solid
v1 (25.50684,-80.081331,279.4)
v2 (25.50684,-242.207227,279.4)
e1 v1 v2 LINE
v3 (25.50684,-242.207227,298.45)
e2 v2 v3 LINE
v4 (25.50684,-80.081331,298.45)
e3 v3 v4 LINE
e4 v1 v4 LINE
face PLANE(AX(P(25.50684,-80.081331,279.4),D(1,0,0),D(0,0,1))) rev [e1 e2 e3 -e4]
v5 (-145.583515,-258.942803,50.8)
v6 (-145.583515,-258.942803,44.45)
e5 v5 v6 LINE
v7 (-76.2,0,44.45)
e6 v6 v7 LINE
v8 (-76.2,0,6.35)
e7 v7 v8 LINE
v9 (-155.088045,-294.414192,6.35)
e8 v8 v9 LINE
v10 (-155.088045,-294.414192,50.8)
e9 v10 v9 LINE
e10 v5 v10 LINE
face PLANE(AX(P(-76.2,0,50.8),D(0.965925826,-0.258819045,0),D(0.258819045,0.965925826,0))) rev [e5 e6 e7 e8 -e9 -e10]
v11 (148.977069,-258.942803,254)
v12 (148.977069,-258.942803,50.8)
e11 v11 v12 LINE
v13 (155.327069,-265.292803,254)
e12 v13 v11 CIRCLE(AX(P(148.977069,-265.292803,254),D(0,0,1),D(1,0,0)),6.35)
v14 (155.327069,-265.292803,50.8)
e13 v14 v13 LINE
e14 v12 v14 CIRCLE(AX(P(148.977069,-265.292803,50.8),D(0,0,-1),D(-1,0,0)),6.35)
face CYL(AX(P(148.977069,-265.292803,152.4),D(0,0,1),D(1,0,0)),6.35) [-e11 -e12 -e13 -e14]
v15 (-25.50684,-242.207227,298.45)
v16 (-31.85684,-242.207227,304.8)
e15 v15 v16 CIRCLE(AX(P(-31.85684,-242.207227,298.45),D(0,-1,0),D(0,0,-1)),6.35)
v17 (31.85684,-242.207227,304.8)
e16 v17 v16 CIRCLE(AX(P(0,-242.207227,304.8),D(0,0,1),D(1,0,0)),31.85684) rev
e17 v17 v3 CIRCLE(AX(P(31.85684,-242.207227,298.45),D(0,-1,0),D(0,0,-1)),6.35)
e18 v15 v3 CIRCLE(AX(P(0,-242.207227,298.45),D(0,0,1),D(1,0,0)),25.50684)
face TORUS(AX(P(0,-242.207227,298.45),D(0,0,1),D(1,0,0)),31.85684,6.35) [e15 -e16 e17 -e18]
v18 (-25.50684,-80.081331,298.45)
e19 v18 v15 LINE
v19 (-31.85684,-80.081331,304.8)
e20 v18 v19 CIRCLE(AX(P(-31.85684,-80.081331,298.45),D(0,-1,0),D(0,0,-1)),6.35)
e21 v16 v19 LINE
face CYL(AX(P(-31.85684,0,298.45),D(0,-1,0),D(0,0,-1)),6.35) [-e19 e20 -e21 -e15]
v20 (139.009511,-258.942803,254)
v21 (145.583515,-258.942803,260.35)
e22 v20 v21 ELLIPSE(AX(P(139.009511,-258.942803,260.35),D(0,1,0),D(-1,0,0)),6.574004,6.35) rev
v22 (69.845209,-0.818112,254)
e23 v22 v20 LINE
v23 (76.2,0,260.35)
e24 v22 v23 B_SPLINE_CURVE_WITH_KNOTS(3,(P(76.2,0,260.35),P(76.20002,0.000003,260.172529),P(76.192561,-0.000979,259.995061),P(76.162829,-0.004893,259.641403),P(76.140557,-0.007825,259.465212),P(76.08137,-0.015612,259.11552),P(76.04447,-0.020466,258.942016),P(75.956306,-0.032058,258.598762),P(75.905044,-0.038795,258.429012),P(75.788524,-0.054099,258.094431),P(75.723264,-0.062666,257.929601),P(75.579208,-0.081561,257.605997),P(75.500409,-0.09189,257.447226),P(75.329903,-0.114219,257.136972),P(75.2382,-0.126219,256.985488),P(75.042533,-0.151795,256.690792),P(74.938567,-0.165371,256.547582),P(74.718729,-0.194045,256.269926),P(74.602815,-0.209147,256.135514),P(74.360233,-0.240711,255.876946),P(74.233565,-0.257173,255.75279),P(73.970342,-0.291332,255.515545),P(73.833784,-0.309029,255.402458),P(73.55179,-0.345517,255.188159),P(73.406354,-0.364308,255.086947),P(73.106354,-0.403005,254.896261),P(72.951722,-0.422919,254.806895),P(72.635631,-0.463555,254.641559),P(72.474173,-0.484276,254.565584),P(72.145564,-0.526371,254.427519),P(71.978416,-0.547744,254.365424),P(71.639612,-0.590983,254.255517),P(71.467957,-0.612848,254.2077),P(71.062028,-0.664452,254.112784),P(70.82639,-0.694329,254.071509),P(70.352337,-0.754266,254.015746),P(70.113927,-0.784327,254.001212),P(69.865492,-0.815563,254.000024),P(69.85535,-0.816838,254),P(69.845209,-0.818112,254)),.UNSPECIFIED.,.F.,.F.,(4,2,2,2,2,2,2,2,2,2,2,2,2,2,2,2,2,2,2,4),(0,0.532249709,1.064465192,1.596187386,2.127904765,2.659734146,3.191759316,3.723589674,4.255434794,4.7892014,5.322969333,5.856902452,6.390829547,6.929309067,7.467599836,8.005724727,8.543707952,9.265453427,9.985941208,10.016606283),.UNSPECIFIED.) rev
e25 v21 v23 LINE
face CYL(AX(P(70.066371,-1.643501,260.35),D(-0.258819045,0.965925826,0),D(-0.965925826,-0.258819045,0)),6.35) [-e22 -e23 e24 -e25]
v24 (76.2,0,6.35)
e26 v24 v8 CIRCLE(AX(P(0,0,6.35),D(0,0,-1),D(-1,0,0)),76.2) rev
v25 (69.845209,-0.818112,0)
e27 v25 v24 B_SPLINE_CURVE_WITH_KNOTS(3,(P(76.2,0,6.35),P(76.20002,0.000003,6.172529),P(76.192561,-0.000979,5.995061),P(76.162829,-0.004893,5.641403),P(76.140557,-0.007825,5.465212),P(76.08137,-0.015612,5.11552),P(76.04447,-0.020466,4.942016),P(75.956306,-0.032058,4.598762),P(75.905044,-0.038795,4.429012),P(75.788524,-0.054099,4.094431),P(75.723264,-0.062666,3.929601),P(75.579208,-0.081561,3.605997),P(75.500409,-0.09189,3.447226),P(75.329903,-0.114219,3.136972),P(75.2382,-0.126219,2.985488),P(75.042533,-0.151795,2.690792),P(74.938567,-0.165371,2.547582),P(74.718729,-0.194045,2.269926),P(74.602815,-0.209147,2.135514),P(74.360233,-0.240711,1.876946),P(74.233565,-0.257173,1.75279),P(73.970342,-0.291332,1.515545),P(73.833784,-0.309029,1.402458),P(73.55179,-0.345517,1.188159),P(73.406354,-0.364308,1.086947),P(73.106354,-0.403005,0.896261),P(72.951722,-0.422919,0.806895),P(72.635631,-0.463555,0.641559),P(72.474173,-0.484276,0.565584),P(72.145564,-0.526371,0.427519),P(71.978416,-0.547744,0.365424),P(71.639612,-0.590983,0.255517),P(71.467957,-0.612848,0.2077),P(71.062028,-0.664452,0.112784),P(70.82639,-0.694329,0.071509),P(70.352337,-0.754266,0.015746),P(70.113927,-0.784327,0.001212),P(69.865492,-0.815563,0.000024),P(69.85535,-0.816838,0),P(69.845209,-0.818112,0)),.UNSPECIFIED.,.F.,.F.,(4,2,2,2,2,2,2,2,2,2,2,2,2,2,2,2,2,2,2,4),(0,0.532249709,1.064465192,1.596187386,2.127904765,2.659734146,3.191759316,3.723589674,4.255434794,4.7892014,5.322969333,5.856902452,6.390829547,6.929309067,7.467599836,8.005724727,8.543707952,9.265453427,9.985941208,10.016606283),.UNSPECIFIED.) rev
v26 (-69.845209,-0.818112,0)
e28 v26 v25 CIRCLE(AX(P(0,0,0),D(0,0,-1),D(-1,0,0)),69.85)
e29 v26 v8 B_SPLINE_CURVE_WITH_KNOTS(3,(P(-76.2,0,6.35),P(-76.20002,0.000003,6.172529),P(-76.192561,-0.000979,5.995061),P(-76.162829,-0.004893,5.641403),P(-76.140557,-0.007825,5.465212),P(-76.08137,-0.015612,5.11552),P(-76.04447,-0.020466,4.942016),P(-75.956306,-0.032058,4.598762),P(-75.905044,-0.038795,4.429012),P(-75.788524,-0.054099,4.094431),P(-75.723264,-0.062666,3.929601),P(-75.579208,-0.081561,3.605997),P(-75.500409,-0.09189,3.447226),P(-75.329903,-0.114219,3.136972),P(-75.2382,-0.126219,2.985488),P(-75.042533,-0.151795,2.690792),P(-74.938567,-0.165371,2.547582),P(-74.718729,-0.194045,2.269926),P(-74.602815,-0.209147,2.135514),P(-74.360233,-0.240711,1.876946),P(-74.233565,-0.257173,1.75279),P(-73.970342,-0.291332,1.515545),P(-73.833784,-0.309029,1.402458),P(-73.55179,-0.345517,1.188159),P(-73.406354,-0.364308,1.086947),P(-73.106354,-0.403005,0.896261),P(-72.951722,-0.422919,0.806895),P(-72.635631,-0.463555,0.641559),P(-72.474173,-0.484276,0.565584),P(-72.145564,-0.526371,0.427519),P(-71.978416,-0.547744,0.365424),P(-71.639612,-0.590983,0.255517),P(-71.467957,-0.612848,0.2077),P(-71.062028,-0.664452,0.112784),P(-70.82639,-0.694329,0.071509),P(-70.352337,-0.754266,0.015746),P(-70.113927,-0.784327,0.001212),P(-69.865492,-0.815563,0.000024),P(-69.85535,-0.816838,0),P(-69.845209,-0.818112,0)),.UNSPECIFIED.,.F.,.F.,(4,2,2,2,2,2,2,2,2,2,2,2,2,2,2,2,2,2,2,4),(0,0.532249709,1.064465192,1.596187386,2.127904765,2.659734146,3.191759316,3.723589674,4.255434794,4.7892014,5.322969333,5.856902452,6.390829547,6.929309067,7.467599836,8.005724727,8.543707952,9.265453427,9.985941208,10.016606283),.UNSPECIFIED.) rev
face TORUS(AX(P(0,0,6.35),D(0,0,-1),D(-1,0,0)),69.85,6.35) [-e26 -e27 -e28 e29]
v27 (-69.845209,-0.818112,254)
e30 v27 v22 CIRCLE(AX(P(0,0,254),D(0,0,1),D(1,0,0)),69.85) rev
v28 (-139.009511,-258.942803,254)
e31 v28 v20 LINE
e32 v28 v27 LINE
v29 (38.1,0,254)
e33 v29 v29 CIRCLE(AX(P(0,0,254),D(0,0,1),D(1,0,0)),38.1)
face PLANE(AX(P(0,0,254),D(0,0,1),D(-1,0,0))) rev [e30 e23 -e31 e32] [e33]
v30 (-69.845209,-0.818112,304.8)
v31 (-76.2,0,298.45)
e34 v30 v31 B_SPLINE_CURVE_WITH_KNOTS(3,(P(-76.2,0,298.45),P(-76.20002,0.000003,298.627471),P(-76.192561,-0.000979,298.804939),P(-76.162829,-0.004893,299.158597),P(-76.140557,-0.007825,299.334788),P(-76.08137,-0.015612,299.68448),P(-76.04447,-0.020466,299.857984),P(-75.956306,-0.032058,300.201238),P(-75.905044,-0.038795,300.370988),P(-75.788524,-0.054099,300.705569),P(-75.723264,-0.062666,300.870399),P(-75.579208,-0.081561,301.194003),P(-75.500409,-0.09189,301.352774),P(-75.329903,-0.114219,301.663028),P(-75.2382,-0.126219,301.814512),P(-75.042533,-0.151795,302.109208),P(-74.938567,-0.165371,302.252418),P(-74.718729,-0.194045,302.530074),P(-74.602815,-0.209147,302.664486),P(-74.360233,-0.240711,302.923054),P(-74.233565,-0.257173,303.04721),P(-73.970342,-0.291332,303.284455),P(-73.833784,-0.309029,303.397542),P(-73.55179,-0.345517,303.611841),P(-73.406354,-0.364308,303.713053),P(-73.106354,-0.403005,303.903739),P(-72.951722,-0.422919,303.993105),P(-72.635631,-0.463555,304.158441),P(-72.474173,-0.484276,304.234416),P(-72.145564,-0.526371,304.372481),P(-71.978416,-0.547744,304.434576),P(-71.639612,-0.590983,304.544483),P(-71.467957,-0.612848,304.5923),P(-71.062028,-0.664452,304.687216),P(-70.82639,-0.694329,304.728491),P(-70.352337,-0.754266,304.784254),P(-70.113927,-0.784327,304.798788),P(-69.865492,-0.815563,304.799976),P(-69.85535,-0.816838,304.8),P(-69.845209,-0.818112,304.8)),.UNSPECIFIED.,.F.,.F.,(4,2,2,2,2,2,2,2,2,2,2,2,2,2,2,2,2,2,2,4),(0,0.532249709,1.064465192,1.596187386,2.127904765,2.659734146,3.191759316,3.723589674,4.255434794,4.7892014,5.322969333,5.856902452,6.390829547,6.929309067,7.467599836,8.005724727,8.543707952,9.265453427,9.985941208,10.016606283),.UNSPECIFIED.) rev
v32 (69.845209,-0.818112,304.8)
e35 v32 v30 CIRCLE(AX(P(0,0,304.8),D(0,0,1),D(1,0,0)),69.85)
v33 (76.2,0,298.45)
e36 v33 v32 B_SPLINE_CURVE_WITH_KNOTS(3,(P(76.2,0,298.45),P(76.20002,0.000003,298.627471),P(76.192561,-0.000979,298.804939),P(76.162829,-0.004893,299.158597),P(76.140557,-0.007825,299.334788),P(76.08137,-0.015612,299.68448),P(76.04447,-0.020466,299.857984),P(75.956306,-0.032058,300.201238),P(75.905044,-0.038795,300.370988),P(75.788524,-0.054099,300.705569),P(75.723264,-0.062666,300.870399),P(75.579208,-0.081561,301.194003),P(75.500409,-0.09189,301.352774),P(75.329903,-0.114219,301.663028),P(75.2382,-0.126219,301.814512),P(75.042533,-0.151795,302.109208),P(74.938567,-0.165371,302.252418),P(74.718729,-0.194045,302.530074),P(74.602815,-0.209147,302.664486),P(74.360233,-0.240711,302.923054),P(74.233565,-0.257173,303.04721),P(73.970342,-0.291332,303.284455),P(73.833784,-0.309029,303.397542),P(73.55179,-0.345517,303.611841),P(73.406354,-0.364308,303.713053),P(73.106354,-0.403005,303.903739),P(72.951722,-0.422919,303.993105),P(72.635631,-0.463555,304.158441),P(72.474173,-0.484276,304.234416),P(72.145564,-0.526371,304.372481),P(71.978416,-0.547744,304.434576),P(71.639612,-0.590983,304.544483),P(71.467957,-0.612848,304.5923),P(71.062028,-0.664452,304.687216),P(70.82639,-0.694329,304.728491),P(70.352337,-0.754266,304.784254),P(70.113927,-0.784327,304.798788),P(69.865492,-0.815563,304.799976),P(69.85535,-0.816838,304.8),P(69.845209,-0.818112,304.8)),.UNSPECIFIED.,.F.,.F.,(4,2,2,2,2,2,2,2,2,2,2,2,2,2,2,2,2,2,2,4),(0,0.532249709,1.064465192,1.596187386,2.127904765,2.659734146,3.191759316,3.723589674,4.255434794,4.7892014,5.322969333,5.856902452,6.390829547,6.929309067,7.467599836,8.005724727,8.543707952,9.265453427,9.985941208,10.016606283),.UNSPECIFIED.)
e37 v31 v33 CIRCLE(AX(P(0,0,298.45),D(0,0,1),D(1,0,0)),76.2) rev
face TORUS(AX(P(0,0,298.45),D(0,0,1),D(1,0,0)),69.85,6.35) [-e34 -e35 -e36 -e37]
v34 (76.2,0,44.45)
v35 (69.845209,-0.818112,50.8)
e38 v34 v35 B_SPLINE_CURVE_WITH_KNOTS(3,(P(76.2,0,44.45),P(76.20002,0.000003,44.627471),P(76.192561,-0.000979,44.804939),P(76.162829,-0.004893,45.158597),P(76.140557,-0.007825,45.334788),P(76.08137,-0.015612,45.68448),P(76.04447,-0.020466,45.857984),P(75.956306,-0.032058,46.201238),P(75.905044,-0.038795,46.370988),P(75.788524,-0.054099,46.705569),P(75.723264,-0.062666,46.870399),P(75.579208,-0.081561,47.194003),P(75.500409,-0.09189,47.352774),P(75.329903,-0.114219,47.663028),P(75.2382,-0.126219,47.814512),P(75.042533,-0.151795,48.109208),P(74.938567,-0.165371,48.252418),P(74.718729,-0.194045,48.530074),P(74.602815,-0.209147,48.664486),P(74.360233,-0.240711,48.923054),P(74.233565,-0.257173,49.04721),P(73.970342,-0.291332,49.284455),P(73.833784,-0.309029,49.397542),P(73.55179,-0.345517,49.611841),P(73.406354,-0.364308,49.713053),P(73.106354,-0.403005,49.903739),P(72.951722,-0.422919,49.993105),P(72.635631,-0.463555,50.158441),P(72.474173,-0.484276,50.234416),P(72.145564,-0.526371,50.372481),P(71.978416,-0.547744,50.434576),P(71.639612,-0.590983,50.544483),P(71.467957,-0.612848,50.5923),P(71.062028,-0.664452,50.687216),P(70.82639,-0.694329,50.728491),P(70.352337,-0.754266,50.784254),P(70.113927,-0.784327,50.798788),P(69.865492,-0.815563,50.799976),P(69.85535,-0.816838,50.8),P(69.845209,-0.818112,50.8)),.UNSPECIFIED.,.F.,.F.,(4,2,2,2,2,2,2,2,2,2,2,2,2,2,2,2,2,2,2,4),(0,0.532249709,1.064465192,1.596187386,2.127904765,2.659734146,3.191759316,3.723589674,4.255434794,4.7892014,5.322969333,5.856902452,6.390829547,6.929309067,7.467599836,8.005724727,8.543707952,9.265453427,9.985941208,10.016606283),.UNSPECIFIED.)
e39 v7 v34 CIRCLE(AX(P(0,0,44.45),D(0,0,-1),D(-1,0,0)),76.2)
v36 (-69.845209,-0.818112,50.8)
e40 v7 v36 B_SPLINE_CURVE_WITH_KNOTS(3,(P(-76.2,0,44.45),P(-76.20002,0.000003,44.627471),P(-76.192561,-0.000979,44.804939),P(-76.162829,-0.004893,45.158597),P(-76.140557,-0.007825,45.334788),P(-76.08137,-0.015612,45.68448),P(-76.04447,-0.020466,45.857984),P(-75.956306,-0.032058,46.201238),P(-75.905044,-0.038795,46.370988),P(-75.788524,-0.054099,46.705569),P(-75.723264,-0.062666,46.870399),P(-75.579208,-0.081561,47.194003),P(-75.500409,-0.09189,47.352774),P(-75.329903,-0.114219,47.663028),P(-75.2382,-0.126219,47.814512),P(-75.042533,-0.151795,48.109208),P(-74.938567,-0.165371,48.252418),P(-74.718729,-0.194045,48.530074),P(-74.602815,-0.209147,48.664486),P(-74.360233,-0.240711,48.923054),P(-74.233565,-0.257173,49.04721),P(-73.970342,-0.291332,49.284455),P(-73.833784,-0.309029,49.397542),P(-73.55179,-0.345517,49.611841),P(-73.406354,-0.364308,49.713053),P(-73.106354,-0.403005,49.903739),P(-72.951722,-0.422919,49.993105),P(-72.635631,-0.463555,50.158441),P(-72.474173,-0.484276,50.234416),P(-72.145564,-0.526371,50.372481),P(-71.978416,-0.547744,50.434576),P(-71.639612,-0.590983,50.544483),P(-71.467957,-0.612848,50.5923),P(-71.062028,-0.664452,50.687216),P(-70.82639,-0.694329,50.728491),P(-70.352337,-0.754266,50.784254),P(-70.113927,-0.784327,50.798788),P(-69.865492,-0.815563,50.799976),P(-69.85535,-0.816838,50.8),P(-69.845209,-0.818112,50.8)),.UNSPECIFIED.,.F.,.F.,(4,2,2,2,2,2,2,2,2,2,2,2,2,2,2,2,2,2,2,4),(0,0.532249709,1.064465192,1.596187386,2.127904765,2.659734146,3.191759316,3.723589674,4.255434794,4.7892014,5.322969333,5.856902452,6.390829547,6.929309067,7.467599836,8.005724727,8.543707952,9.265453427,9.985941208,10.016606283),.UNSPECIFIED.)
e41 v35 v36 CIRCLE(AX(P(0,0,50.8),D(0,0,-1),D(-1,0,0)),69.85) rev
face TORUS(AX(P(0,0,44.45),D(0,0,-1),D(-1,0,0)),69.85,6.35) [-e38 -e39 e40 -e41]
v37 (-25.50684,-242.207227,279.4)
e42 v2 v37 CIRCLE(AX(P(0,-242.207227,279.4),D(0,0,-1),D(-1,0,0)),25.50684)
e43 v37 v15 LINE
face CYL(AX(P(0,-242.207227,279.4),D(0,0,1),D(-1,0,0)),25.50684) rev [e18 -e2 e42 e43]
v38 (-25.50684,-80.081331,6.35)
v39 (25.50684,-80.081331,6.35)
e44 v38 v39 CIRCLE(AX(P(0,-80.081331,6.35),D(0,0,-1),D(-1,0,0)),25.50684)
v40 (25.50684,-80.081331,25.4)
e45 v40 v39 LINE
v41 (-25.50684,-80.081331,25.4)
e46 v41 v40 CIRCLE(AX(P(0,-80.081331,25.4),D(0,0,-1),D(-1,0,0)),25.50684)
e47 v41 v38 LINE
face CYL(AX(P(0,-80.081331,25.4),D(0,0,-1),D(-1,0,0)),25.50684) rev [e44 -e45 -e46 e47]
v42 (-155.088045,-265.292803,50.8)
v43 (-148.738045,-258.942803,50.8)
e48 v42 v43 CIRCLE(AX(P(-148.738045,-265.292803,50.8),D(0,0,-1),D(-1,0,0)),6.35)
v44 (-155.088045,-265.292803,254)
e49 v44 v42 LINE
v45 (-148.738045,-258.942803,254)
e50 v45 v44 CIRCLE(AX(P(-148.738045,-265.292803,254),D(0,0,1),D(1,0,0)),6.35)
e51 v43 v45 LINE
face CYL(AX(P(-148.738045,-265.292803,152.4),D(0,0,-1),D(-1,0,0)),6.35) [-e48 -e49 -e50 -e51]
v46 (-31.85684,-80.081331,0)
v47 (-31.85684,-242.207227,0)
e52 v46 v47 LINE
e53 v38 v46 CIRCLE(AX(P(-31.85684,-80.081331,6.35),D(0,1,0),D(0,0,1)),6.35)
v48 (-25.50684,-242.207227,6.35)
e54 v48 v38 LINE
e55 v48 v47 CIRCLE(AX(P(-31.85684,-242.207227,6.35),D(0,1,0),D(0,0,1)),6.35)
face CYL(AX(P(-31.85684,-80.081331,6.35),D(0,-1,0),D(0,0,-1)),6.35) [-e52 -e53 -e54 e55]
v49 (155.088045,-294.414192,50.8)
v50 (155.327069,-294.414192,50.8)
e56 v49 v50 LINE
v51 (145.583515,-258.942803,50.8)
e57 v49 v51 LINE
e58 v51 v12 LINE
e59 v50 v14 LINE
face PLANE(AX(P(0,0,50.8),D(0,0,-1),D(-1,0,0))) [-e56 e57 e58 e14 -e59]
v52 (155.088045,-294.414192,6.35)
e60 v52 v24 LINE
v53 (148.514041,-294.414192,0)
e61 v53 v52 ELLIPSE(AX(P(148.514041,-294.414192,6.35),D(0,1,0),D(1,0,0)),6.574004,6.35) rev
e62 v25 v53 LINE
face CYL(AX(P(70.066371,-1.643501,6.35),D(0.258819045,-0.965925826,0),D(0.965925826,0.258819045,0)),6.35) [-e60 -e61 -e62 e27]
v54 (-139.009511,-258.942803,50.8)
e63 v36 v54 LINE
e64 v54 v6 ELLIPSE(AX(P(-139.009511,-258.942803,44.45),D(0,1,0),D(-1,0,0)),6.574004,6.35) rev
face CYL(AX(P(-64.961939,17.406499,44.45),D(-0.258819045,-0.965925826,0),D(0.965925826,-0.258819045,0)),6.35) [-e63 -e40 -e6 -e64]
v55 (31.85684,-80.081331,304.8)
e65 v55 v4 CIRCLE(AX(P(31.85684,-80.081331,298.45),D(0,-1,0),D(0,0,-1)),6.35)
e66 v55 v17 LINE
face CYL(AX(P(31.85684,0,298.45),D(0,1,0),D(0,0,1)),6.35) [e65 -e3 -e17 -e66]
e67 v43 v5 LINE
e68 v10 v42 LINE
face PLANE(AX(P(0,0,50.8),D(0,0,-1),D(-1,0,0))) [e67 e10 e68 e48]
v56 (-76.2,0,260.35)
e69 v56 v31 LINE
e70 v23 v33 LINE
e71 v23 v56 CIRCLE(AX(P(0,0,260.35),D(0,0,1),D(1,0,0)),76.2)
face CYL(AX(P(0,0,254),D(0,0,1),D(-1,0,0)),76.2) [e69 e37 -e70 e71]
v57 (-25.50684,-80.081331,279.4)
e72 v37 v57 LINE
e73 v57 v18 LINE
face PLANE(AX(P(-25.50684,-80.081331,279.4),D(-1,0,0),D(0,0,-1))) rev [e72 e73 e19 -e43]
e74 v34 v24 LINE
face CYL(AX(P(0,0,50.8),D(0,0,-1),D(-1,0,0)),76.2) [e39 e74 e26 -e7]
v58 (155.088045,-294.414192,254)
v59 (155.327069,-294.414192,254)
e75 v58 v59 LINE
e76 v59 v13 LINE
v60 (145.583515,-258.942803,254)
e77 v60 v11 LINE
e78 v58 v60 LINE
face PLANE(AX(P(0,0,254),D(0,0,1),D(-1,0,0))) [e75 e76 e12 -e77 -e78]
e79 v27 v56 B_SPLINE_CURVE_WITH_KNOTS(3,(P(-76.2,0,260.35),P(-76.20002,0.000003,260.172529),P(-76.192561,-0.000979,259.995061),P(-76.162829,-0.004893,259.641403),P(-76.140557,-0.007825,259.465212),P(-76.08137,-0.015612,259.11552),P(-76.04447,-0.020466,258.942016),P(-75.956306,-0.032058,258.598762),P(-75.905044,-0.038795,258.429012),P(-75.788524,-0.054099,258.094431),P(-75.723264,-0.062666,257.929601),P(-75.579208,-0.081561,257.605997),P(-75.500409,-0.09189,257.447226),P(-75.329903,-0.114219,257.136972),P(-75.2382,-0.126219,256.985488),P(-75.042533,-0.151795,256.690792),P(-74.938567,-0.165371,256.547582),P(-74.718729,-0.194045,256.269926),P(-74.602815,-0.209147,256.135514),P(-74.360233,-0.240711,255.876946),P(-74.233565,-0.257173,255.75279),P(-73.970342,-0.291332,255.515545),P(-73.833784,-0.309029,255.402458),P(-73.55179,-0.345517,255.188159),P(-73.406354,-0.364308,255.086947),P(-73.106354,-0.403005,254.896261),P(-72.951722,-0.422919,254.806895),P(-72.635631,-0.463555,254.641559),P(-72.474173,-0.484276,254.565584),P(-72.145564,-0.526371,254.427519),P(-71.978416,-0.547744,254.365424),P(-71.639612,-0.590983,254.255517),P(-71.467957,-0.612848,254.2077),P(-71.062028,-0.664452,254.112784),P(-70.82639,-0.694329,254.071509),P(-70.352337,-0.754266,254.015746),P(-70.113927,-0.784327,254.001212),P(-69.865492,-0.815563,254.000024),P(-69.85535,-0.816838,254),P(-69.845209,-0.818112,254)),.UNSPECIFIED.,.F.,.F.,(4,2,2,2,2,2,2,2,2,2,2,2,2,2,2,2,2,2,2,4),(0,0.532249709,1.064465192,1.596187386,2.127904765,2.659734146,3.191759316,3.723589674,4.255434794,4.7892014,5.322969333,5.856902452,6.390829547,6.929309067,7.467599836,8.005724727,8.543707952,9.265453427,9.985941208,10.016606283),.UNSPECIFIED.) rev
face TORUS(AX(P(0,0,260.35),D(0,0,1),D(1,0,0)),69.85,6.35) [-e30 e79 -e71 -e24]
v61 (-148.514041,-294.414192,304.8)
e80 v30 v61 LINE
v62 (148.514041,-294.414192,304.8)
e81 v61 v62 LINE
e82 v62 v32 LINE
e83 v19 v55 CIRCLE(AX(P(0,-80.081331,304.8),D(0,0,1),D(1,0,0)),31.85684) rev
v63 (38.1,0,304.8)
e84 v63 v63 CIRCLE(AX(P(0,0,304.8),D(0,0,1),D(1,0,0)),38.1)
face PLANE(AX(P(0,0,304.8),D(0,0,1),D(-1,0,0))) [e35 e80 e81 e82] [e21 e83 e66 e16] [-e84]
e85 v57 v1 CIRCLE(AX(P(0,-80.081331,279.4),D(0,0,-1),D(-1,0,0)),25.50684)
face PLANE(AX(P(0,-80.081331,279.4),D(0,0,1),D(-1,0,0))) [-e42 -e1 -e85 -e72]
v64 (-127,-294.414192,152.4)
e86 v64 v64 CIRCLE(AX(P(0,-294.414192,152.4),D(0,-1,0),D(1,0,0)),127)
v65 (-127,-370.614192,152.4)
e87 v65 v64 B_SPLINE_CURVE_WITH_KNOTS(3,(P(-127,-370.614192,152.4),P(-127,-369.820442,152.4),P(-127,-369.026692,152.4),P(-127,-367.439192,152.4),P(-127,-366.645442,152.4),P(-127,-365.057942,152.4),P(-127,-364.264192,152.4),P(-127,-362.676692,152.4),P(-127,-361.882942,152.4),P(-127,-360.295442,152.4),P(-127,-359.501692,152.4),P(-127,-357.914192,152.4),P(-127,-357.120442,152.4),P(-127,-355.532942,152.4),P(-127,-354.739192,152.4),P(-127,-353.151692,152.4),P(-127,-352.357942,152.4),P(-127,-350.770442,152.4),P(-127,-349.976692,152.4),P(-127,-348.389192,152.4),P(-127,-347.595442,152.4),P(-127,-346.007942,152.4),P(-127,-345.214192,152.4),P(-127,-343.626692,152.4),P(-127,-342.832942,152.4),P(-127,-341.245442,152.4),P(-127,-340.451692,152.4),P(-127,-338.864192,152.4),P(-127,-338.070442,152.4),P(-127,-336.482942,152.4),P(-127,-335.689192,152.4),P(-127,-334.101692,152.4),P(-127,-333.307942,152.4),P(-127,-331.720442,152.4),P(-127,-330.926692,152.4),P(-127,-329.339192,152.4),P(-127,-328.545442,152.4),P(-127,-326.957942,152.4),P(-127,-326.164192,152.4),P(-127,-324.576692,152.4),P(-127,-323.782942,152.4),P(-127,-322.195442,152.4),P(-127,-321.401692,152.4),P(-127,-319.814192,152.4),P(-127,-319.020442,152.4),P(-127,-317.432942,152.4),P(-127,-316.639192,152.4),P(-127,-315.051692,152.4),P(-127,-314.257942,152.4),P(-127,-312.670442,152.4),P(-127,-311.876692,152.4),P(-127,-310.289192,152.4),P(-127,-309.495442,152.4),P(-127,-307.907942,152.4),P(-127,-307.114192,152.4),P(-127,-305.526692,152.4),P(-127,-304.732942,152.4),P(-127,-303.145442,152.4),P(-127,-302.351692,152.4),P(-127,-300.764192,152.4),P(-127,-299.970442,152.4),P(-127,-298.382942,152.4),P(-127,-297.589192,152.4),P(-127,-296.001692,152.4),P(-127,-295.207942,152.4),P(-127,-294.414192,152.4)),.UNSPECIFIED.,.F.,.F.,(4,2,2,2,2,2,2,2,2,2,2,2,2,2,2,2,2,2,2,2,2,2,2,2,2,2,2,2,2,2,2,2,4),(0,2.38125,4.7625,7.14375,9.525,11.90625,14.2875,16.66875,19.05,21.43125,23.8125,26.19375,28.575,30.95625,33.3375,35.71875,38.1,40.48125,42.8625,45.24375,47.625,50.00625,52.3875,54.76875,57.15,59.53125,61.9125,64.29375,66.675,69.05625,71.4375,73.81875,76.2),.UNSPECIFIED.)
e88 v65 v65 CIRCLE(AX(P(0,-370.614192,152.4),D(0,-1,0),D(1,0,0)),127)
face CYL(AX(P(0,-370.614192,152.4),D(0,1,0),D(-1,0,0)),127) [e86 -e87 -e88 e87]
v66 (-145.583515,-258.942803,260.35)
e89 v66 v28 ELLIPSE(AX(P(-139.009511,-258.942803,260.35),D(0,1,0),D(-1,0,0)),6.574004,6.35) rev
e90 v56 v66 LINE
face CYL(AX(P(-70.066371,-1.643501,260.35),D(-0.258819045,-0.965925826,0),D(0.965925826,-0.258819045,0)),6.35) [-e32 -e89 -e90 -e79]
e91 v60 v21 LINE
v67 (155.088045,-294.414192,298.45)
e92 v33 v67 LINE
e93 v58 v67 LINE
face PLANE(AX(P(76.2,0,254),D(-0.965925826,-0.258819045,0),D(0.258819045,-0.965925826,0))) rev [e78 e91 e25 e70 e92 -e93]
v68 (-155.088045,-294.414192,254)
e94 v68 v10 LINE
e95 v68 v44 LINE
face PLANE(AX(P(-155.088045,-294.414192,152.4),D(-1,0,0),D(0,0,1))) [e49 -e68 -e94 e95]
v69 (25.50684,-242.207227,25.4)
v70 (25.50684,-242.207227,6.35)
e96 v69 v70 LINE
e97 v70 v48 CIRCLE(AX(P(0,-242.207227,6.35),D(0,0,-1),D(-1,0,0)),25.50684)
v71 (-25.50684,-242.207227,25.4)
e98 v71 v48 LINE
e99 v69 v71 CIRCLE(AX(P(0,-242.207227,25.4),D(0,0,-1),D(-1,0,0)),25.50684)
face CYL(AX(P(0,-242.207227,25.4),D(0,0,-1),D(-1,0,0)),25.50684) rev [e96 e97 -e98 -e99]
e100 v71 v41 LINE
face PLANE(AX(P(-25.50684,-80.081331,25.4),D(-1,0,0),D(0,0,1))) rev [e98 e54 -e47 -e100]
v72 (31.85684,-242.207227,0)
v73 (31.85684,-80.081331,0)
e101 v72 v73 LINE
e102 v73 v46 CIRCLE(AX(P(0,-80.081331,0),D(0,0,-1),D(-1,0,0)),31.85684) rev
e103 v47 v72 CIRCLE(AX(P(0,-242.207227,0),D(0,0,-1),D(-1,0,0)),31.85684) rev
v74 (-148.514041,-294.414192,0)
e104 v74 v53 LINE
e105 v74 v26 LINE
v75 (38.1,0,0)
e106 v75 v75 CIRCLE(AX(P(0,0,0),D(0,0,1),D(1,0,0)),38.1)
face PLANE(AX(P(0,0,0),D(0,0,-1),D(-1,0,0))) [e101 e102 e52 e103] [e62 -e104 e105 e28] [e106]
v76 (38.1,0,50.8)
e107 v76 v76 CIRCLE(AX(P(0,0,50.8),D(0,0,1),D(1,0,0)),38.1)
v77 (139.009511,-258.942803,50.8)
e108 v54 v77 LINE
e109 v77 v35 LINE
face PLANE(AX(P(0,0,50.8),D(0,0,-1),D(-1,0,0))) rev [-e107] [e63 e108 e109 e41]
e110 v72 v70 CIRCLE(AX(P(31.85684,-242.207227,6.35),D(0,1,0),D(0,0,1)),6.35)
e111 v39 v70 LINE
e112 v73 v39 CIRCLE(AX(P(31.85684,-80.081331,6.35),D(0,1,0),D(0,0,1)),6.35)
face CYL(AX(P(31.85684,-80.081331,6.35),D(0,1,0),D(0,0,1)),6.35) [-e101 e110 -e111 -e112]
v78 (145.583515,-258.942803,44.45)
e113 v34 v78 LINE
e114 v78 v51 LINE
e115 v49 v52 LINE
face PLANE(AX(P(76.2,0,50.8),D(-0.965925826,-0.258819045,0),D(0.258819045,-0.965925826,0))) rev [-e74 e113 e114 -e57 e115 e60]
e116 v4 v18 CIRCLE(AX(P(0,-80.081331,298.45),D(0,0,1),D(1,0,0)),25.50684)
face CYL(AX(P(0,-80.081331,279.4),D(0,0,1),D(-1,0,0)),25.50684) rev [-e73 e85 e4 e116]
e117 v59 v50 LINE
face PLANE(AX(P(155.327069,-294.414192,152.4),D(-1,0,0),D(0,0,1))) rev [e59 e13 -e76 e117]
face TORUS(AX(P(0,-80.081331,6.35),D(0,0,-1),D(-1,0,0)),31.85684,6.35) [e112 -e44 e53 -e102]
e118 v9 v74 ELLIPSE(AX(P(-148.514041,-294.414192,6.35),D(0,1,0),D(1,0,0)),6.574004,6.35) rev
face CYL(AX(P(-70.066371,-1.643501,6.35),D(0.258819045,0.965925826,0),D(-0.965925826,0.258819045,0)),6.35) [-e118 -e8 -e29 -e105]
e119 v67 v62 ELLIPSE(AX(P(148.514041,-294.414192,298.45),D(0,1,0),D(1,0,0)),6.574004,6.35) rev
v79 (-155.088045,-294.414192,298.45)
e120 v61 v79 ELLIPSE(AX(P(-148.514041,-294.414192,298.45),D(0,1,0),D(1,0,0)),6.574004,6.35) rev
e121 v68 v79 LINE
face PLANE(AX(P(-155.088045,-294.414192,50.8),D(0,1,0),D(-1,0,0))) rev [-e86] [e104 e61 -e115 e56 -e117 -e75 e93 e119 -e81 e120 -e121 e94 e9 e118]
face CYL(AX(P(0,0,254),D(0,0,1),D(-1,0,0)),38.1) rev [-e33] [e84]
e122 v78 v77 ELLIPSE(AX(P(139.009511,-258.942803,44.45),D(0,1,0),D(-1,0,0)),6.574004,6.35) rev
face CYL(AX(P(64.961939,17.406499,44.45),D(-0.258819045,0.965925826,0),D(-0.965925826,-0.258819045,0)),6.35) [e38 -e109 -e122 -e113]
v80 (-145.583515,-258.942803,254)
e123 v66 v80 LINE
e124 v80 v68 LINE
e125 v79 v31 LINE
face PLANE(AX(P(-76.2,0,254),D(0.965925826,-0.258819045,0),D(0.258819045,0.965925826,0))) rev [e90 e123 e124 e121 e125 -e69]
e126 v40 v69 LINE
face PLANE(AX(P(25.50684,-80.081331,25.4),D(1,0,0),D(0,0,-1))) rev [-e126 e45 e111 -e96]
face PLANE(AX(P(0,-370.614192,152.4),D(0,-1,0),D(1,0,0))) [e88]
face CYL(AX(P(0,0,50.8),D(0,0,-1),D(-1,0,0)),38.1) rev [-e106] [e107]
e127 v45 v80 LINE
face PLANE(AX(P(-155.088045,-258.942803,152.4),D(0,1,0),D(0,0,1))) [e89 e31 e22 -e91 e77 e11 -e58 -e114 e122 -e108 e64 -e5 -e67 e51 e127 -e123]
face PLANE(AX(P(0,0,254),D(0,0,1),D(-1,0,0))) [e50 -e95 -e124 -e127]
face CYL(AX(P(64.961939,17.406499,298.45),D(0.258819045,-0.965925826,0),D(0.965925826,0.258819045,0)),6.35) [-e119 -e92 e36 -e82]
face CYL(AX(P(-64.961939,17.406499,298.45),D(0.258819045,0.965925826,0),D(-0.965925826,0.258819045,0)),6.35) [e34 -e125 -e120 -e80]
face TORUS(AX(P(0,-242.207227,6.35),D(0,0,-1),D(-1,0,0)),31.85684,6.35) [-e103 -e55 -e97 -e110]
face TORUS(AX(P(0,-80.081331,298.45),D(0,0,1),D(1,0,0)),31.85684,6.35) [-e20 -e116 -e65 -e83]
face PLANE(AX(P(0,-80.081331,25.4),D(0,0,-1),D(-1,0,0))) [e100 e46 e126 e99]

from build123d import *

# Parameters (mm, degrees)
SKETCH2_R           = 38.1
BOSS_EXTRUDE2_DEPTH = 50.8
SKETCH4_W           = 310.4151135
SKETCH4_H           = 35.471388383
BOSS_EXTRUDE4_DEPTH = 101.6
CUT_EXTRUDE1_DEPTH  = 25.4
FILLET1_R           = 6.35
FILLET2_R           = 6.35
FILLET3_R           = 6.35
FILLET4_R           = 6.35
FILLET5_R           = 6.35
SKETCH8_R           = 127
BOSS_EXTRUDE5_DEPTH = 76.2


with BuildPart() as part:
    # Sketch2 → Boss-Extrude2 (new body)
    with BuildSketch(Plane.XY):
        with BuildLine():
            Line((-76.2, 0), (-155.088044947, -294.414191853))
            Line((-155.088044947, -294.414191853), (155.088044947, -294.414191853))
            Line((155.088044947, -294.414191853), (76.2, 0))
            ThreePointArc((76.2, 0), (0, 76.2), (-76.2, 0))
        make_face()
        Circle(SKETCH2_R, mode=Mode.SUBTRACT)
    extrude(amount=BOSS_EXTRUDE2_DEPTH)

    # Sketch4 → Boss-Extrude4 (add)
    with BuildSketch(Plane.XY.offset(50.8)):
        with Locations((0.119511803, -276.678497662)):
            Rectangle(SKETCH4_W, SKETCH4_H)
    extrude(amount=BOSS_EXTRUDE4_DEPTH)

    # Sketch5 → Cut-Extrude1 (cut)
    with BuildSketch(Plane(origin=(0, 0, 0), x_dir=(-1, 0, 0), z_dir=(0, 0, -1))):
        with BuildLine():
            Line((25.506839575, -80.081330591), (25.506839575, -242.20722706))
            ThreePointArc((25.506839575, -242.20722706), (0, -267.714066635), (-25.506839575, -242.20722706))
            Line((-25.506839575, -242.20722706), (-25.506839575, -80.081330591))
            ThreePointArc((-25.506839575, -80.081330591), (0, -54.574491016), (25.506839575, -80.081330591))
        make_face()
    extrude(amount=-CUT_EXTRUDE1_DEPTH, mode=Mode.SUBTRACT)

    # Mirror5: part across plane


with BuildPart() as part_1:
    add(part.part)
    add(part.part.mirror(Plane(origin=(0, 0, 152.4), x_dir=(1, 0, 0), z_dir=(0, 0, -1))))

    # Fillet1
    fillet1_edges = [part_1.edges().sort_by_distance(p)[0] for p in [
        (115.644022474, -147.207095926, 304.8),
    ]]
    fillet(fillet1_edges, radius=FILLET1_R)

    # Fillet2
    fillet2_edges = [part_1.edges().sort_by_distance(p)[0] for p in [
        (-115.644022474, -147.207095926, 304.8),
    ]]
    fillet(fillet2_edges, radius=FILLET2_R)

    # Fillet3
    fillet3_edges = [part_1.edges().sort_by_distance(p)[0] for p in [
        (0, 76.2, 304.8),
    ]]
    fillet(fillet3_edges, radius=FILLET3_R)

    # Fillet4
    fillet4_edges = [part_1.edges().sort_by_distance(p)[0] for p in [
        (0, -54.574491016, 304.8),
        (25.506839575, -161.144278825, 304.8),
        (0, -267.714066635, 304.8),
        (-25.506839575, -161.144278825, 304.8),
    ]]
    fillet(fillet4_edges, radius=FILLET4_R)

    # Fillet5
    fillet5_edges = [part_1.edges().sort_by_distance(p)[0] for p in [
        (110.891757538, -129.471401735, 254),
    ]]
    fillet(fillet5_edges, radius=FILLET5_R)
    fillet5_2_edges = [part_1.edges().sort_by_distance(p)[0] for p in [
        (-110.891757538, -129.471401735, 254),
    ]]
    fillet(fillet5_2_edges, radius=FILLET5_R)
    fillet5_3_edges = [part_1.edges().sort_by_distance(p)[0] for p in [
        (-155.088044947, -258.94280347, 152.4),
    ]]
    fillet(fillet5_3_edges, radius=FILLET5_R)
    fillet5_4_edges = [part_1.edges().sort_by_distance(p)[0] for p in [
        (-115.644022474, -147.207095926, 0),
    ]]
    fillet(fillet5_4_edges, radius=FILLET5_R)
    fillet5_5_edges = [part_1.edges().sort_by_distance(p)[0] for p in [
        (-110.891757538, -129.471401735, 50.8),
    ]]
    fillet(fillet5_5_edges, radius=FILLET5_R)
    fillet5_6_edges = [part_1.edges().sort_by_distance(p)[0] for p in [
        (155.327068553, -258.94280347, 152.4),
    ]]
    fillet(fillet5_6_edges, radius=FILLET5_R)
    fillet5_7_edges = [part_1.edges().sort_by_distance(p)[0] for p in [
        (115.644022474, -147.207095926, 0),
    ]]
    fillet(fillet5_7_edges, radius=FILLET5_R)
    fillet5_8_edges = [part_1.edges().sort_by_distance(p)[0] for p in [
        (0, -54.574491016, 0),
        (-25.506839575, -161.144278825, 0),
        (0, -267.714066635, 0),
        (25.506839575, -161.144278825, 0),
    ]]
    fillet(fillet5_8_edges, radius=FILLET5_R)
    fillet5_9_edges = [part_1.edges().sort_by_distance(p)[0] for p in [
        (110.891757538, -129.471401735, 50.8),
    ]]
    fillet(fillet5_9_edges, radius=FILLET5_R)
    fillet5_10_edges = [part_1.edges().sort_by_distance(p)[0] for p in [
        (0, 76.2, 50.8),
    ]]
    fillet(fillet5_10_edges, radius=FILLET5_R - 0.0001)  # a hair under: the kernel refuses the full size
    fillet5_11_edges = [part_1.edges().sort_by_distance(p)[0] for p in [
        (0, 76.2, 254),
    ]]
    fillet(fillet5_11_edges, radius=FILLET5_R - 0.0001)  # a hair under: the kernel refuses the full size
    fillet5_12_edges = [part_1.edges().sort_by_distance(p)[0] for p in [
        (0, 76.2, 0),
    ]]
    fillet(fillet5_12_edges, radius=FILLET5_R - 0.0001)  # a hair under: the kernel refuses the full size

    # Sketch8 → Boss-Extrude5 (add)
    with BuildSketch(Plane(origin=(0, -294.414191853, 0), x_dir=(-1, 0, 0), z_dir=(0, -1, 0))):
        with Locations((0, -152.4)):
            Circle(SKETCH8_R)
    extrude(amount=BOSS_EXTRUDE5_DEPTH)


solid = part_1.part
